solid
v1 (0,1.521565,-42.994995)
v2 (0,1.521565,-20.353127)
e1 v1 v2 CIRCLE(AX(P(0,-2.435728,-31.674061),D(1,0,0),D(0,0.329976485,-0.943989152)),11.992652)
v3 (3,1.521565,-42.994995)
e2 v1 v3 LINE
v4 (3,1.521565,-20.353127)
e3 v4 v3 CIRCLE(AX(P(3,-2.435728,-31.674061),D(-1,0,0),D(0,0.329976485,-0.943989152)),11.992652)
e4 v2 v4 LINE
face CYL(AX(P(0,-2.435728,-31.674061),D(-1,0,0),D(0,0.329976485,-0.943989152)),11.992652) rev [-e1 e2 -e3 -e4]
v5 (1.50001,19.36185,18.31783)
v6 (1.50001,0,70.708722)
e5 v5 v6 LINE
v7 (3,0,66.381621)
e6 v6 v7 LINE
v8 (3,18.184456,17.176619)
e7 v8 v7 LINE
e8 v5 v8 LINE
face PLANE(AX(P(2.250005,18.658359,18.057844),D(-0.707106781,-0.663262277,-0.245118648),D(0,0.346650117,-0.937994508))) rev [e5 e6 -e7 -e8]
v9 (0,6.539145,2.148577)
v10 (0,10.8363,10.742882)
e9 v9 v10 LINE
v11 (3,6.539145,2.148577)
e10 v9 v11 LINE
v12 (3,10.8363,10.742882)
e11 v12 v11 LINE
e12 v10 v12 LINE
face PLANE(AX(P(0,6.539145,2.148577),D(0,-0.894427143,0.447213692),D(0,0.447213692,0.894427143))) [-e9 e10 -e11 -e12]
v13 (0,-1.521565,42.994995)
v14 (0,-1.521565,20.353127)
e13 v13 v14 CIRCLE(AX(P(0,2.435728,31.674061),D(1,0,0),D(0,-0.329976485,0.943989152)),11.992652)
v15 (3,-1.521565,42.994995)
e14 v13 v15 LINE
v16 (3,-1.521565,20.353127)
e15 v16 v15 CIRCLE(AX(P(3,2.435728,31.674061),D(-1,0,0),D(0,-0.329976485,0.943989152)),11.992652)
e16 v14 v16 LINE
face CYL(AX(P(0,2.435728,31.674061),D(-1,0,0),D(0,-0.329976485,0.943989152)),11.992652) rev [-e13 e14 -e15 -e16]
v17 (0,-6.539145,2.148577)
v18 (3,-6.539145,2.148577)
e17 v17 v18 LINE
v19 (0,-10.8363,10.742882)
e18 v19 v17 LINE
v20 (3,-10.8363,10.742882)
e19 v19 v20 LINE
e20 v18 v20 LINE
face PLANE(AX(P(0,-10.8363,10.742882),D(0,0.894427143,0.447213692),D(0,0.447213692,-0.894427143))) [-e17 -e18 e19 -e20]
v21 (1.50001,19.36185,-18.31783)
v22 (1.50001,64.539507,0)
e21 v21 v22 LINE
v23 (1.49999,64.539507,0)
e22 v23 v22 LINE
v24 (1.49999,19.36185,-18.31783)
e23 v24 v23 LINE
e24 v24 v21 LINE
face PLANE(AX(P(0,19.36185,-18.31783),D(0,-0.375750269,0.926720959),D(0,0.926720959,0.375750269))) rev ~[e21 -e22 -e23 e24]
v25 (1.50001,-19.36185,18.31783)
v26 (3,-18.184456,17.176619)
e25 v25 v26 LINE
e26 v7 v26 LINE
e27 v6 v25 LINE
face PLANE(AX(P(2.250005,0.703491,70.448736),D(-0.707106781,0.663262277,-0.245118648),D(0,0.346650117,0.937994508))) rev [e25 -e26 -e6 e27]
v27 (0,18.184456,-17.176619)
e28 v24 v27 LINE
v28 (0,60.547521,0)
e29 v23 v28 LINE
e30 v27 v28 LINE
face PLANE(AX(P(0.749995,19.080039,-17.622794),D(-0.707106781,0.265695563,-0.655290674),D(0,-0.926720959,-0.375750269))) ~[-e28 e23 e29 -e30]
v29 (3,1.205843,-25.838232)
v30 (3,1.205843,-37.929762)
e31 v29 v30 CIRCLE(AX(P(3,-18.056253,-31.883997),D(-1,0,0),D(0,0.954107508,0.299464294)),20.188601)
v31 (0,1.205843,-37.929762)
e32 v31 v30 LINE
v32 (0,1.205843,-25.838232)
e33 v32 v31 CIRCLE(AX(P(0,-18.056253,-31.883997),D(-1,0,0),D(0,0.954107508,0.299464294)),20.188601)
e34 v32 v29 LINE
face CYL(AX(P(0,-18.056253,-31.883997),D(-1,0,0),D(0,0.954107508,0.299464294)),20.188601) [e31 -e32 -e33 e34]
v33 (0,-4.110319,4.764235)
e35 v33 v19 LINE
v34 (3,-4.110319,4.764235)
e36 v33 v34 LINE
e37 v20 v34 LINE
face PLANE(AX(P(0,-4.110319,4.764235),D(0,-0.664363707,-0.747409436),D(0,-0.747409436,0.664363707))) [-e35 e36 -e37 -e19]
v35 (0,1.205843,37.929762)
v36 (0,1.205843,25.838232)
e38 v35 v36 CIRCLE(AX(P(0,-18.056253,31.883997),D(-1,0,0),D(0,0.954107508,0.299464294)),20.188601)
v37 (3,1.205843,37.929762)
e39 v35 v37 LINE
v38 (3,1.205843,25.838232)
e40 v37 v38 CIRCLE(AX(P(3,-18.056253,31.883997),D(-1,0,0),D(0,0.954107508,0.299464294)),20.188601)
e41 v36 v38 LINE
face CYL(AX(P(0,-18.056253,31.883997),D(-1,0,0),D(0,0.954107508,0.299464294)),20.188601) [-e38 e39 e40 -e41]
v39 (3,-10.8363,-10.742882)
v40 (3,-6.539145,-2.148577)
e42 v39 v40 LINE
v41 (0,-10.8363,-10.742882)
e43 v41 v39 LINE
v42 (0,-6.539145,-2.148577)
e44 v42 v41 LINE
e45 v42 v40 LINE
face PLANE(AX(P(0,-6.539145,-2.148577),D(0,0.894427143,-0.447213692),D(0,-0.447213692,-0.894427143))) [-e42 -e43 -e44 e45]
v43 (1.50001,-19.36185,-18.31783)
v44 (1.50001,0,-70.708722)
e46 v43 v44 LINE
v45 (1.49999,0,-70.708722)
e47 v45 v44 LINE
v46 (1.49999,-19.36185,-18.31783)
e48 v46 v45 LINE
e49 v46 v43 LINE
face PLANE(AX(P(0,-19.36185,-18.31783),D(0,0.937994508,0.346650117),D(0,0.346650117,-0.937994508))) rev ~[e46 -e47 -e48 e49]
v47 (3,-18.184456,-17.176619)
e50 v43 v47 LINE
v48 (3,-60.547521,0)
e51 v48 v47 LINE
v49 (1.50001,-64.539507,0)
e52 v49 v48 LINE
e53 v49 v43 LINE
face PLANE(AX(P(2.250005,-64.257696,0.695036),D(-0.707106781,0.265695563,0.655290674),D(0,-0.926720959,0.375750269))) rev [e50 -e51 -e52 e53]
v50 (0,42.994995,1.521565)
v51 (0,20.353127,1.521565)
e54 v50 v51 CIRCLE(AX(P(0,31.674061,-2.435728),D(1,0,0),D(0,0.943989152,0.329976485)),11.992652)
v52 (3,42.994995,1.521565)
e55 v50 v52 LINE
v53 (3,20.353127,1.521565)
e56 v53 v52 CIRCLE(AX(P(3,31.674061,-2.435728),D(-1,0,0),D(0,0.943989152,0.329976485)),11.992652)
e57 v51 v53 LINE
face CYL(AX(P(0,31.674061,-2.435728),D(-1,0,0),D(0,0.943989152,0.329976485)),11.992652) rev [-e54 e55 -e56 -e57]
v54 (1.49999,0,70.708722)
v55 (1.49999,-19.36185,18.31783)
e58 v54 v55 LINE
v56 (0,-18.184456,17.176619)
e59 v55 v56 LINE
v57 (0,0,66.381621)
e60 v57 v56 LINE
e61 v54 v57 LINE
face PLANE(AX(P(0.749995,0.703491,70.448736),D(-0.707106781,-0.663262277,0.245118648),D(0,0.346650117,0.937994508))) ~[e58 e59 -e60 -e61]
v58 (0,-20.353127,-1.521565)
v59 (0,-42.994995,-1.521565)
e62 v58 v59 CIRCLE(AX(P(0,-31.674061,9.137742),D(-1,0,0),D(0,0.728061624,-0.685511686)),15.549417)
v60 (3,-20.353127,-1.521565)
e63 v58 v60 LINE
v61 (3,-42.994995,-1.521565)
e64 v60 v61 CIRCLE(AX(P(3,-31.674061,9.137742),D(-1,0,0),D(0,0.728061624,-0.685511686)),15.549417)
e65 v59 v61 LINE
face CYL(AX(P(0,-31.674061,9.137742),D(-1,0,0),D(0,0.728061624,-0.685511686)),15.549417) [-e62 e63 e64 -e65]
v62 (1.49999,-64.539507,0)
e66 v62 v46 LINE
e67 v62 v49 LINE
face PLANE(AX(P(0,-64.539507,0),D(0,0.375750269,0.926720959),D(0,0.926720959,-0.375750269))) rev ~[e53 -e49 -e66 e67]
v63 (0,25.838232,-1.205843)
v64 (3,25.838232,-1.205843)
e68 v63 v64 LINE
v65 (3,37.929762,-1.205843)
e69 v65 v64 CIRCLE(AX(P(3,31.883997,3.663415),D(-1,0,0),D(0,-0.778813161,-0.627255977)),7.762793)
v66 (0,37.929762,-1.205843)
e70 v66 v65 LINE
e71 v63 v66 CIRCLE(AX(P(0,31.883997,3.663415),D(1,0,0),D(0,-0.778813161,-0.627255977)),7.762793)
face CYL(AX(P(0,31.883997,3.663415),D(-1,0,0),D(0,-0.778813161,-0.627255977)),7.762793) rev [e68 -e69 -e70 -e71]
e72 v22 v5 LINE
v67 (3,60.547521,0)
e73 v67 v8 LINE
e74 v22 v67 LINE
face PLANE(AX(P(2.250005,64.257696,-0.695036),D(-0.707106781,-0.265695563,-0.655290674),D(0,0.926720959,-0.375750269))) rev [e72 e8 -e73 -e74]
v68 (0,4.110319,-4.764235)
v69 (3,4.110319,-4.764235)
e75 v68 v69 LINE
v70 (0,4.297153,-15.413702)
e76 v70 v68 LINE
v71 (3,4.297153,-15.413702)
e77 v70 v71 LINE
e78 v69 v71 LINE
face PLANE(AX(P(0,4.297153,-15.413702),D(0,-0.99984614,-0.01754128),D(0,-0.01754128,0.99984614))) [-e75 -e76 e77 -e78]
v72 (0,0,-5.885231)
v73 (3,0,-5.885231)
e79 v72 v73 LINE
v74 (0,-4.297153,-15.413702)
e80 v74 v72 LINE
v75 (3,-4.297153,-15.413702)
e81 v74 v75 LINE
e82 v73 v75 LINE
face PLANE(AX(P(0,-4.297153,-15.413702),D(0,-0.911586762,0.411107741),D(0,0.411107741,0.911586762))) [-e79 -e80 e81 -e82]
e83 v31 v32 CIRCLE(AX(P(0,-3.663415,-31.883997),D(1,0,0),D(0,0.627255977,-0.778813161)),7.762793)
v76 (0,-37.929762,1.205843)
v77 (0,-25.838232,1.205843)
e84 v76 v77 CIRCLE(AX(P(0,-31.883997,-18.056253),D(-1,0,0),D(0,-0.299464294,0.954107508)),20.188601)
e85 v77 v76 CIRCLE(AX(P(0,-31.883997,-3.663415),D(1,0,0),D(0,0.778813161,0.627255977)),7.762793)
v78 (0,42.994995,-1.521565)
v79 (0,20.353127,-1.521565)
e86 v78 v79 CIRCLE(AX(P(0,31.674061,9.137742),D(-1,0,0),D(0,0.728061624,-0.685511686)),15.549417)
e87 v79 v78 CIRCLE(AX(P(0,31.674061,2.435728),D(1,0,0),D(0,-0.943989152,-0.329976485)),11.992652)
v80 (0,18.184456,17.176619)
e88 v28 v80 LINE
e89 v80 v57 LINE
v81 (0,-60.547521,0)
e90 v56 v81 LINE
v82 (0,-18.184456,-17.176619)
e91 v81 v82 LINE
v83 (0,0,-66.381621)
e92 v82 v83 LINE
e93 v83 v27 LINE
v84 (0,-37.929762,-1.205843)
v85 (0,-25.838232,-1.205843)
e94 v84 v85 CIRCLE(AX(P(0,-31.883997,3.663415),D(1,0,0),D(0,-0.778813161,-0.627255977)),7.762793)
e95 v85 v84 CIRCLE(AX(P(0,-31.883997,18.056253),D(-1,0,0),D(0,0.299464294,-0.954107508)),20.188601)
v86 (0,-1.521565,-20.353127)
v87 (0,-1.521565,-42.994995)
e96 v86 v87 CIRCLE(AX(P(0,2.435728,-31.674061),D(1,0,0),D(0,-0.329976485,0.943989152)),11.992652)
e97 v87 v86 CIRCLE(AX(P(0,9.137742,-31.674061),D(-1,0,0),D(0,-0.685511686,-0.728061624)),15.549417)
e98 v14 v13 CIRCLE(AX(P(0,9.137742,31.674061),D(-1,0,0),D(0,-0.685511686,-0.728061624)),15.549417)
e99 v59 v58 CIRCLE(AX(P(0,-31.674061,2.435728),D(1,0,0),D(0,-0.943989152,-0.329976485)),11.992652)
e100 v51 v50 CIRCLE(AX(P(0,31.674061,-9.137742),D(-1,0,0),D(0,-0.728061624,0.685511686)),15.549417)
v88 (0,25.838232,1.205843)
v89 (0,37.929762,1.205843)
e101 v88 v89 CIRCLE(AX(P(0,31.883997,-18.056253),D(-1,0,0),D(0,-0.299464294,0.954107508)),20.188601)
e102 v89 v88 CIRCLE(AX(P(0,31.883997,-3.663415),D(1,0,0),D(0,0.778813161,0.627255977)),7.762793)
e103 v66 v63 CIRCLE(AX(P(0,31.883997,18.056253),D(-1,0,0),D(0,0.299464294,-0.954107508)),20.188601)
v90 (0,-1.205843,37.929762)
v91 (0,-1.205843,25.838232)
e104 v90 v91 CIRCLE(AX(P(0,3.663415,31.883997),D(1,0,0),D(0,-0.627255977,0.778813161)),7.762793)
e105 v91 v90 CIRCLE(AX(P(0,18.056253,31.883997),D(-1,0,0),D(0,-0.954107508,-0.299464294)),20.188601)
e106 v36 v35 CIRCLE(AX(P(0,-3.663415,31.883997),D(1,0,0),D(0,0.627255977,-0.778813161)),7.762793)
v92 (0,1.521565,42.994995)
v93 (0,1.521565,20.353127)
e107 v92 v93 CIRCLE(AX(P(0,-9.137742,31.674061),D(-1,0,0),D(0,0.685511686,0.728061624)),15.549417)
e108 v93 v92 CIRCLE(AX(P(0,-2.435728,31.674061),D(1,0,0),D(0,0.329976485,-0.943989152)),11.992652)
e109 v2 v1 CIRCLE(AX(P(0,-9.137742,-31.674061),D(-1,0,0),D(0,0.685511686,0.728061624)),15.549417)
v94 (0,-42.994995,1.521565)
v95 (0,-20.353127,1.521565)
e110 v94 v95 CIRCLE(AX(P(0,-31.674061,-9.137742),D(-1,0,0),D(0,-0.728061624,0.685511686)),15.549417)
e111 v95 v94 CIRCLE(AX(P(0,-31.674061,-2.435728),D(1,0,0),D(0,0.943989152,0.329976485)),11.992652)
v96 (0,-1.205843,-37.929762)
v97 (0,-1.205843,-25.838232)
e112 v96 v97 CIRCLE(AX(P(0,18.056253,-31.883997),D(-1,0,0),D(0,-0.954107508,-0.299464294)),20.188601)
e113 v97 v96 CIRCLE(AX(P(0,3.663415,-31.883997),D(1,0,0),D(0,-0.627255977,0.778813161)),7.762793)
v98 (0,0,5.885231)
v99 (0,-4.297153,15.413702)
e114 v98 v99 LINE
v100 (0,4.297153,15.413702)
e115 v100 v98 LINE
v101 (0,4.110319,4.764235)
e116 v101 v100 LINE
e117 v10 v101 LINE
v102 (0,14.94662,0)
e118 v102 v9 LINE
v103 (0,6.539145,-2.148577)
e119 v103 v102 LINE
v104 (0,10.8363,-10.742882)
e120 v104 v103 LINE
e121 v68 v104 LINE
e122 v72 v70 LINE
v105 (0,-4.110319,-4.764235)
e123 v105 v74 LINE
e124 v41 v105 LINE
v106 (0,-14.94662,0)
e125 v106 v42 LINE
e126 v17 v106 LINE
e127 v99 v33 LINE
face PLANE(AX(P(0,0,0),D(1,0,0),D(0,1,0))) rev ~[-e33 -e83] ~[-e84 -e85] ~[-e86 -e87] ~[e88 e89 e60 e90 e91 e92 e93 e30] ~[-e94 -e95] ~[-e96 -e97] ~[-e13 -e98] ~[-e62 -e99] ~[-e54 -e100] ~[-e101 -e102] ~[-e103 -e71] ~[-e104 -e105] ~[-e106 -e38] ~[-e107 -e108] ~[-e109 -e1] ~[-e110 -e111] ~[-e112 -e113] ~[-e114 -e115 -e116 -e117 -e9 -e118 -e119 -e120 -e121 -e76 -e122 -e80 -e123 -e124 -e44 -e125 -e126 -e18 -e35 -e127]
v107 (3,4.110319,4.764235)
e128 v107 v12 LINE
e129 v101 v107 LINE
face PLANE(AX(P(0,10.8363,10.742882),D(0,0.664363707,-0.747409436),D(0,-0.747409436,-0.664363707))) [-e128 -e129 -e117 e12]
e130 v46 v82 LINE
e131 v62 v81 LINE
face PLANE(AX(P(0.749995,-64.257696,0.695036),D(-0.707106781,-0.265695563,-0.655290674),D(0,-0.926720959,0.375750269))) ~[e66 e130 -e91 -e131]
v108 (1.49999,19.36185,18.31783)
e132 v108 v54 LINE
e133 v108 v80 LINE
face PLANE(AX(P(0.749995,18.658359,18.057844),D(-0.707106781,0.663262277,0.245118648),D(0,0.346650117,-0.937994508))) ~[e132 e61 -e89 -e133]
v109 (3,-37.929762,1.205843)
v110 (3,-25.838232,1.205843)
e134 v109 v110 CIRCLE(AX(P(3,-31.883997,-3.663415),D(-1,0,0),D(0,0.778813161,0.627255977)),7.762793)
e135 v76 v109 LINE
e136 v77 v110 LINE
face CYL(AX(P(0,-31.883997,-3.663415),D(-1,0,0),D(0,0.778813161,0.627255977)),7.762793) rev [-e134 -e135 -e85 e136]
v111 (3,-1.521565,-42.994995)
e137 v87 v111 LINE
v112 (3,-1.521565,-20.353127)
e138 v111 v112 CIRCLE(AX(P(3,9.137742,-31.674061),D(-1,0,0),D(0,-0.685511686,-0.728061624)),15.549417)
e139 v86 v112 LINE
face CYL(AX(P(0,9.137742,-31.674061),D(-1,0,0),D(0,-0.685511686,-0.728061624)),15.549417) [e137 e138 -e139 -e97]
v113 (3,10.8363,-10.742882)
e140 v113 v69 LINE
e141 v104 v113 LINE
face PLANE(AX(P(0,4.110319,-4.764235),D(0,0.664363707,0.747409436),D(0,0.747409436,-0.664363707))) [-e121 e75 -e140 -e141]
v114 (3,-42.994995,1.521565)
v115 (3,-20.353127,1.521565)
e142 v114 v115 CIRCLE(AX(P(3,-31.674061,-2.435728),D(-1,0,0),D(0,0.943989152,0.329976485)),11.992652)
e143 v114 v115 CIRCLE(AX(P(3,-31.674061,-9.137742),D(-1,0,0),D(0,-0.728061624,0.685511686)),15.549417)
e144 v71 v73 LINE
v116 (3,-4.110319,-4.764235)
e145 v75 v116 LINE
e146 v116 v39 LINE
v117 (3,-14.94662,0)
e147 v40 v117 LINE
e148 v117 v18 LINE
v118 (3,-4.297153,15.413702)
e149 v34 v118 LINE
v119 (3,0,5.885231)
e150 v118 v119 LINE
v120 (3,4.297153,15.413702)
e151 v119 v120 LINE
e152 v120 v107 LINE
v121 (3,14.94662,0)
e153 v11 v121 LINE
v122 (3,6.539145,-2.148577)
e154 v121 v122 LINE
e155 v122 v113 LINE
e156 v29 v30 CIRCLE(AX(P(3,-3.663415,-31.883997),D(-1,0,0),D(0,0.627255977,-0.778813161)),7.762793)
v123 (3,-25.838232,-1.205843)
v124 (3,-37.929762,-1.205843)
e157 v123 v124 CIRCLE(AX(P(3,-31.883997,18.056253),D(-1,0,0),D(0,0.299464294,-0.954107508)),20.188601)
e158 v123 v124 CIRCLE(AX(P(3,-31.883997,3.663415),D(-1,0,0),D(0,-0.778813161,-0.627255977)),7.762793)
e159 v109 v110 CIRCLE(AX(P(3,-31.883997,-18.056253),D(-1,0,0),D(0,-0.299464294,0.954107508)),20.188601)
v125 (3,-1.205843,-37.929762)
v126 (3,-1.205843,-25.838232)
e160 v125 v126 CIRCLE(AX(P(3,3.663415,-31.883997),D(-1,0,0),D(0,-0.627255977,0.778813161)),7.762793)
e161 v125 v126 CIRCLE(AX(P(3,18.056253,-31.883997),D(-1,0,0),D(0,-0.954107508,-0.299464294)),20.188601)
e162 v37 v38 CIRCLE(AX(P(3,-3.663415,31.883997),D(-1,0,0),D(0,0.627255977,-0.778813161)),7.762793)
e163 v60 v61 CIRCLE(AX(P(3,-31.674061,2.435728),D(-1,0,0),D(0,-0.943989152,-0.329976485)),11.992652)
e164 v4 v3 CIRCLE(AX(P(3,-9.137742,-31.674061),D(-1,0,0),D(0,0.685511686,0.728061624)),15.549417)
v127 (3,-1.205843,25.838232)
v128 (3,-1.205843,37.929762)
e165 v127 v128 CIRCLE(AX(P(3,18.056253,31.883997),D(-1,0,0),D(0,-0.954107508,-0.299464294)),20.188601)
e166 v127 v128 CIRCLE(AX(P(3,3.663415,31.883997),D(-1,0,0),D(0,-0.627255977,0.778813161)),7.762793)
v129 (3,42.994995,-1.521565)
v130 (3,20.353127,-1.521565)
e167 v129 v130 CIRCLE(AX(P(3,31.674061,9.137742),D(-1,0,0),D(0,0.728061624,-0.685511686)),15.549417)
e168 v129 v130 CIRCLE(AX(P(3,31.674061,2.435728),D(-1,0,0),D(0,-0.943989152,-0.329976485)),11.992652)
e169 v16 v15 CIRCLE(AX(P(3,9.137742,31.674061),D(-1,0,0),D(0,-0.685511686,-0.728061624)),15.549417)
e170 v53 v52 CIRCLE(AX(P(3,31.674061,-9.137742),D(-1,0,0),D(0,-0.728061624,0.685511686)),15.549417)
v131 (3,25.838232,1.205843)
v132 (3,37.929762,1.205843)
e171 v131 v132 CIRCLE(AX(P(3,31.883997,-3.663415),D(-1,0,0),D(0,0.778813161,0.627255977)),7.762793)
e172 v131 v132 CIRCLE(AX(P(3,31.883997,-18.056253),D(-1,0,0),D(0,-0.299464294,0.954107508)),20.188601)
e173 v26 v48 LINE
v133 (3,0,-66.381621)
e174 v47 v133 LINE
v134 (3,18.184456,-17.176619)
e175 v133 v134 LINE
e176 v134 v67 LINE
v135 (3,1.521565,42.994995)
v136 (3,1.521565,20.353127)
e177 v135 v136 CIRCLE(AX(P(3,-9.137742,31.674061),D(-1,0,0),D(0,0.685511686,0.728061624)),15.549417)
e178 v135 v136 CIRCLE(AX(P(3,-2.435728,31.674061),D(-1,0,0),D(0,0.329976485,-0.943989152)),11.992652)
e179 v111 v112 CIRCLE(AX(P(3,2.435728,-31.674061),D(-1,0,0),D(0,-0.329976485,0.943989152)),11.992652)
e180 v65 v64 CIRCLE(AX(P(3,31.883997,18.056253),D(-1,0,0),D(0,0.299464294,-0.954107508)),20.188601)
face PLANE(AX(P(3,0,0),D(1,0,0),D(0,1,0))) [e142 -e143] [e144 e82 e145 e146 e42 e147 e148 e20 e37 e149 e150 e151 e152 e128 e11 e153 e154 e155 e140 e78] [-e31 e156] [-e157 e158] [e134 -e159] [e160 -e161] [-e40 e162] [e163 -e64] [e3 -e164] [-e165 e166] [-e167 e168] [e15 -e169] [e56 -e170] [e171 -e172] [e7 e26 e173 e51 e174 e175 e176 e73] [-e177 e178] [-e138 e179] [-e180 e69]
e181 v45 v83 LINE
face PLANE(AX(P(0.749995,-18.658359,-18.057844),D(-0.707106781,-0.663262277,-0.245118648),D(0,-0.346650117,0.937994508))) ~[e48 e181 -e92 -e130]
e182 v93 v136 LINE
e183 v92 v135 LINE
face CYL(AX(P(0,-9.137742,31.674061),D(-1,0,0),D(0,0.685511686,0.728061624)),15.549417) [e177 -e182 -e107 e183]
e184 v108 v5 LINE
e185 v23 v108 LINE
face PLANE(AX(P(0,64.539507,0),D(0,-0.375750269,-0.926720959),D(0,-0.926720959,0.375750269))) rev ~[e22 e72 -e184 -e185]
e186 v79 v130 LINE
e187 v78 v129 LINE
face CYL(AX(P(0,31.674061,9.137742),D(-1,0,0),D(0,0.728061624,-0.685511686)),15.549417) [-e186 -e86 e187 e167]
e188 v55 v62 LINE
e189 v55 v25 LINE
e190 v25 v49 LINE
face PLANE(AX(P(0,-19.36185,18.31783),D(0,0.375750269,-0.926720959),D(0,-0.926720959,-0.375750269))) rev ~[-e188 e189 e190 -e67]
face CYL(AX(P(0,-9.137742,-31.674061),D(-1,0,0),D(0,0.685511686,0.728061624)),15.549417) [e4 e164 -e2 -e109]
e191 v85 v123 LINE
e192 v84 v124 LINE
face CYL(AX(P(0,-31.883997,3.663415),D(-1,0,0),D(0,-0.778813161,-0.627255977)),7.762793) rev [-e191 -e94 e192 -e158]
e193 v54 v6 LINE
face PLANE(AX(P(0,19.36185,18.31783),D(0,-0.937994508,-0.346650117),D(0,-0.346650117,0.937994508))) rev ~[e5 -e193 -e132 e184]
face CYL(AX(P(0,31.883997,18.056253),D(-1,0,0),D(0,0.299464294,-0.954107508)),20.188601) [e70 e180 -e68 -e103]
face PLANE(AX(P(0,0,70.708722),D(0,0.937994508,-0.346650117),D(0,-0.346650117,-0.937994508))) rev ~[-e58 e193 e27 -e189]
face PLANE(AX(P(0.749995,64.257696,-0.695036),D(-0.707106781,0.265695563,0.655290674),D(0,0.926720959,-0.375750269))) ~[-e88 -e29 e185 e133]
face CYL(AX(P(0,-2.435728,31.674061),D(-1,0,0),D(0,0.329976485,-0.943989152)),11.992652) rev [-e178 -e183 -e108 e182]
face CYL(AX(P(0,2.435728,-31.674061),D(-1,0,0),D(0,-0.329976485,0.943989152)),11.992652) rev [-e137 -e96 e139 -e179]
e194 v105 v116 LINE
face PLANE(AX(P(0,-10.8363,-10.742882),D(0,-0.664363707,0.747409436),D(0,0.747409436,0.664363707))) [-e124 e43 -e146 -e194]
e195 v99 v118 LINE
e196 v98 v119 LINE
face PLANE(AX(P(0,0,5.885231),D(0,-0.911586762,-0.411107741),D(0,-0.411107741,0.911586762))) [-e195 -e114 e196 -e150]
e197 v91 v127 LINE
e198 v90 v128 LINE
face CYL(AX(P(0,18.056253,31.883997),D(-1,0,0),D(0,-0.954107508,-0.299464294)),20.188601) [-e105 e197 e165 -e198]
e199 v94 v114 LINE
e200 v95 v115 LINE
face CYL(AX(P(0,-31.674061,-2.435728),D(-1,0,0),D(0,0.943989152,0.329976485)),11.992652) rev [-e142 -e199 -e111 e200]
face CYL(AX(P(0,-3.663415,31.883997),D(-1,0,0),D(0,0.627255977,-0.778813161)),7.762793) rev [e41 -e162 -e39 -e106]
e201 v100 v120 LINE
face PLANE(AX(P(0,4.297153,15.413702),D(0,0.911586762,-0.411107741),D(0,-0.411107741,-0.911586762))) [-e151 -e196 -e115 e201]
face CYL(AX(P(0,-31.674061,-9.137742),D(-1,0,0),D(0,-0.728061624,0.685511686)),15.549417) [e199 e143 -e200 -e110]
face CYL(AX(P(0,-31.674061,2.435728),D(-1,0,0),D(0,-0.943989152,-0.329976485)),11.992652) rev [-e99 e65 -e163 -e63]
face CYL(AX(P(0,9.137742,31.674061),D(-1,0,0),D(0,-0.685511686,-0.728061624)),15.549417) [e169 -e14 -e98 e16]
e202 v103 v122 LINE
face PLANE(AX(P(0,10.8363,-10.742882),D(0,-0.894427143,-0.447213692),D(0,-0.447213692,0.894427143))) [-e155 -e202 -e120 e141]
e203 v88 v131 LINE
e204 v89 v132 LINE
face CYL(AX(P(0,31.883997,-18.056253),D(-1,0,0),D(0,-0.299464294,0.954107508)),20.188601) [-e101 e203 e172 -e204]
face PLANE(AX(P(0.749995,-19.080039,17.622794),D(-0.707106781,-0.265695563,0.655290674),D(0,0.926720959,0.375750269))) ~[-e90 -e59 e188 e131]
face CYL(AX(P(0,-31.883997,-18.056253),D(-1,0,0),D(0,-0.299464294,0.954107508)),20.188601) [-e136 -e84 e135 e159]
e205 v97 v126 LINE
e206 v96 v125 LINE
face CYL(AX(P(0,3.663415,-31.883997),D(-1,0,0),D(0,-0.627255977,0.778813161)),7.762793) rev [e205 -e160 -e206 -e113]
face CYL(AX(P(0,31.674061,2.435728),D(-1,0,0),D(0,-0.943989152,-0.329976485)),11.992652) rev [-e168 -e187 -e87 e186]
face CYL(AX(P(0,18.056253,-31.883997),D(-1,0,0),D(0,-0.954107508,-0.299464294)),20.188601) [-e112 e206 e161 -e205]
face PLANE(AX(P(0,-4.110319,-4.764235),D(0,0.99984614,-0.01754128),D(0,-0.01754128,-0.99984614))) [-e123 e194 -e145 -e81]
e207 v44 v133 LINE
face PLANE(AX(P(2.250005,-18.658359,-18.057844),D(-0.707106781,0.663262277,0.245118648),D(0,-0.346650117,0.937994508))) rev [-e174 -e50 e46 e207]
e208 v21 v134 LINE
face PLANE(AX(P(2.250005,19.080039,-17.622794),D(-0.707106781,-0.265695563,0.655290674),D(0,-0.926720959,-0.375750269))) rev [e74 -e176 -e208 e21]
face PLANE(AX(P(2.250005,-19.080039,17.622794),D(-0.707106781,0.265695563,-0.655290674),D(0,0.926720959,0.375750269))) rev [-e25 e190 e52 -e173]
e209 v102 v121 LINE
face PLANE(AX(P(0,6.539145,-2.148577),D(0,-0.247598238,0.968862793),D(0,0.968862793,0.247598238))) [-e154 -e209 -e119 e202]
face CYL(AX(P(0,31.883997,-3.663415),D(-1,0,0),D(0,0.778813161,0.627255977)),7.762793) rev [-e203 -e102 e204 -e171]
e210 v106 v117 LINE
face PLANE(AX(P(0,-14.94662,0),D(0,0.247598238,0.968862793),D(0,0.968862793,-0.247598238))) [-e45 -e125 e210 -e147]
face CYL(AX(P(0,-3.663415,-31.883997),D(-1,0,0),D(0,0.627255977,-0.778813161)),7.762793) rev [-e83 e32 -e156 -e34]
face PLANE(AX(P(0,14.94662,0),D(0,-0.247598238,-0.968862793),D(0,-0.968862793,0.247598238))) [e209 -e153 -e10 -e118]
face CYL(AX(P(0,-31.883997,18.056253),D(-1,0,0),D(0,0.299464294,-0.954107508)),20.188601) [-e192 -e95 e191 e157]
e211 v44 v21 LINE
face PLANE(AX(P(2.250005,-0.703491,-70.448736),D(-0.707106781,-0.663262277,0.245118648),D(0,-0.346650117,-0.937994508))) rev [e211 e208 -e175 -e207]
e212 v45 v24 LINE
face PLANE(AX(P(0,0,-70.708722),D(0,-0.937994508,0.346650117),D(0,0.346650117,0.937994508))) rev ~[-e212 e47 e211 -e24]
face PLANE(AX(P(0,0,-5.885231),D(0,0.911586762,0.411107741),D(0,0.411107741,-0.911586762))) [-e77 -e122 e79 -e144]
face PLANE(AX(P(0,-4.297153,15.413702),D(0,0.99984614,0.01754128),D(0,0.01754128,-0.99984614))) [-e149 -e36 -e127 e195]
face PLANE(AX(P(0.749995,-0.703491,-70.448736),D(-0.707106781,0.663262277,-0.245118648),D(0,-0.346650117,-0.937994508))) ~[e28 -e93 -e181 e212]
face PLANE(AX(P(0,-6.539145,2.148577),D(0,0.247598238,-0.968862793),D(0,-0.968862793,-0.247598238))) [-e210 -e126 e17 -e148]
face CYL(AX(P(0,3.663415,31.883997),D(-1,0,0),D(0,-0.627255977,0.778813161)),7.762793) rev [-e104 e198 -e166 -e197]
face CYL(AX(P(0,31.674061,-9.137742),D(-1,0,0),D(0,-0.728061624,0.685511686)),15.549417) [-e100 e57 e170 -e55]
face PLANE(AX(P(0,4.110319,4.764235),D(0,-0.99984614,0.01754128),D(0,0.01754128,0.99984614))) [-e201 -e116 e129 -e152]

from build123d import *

# Parameters (mm, degrees)
F1_DEPTH = 3
F2_SIZE  = 1.49999
F4_DEPTH = 25
F6_DEPTH = 3.001
F8_COUNT = 4


# Not quite as in the source:
# - a fillet or chamfer is up to 0.001 mm smaller than in the source, because OpenCascade refuses the exact size


with BuildPart() as f1:
    # F0 (on Right) → F1 (new body)
    with BuildSketch(Plane.YZ):
        Polygon((-19.3618498743, -18.3178298175), (0, -70.7087218761), (19.3618498743, -18.3178298175), (64.5395070314, 0), (19.3618498743, 18.3178298175), (0, 70.7087218761), (-19.3618498743, 18.3178298175), (-64.5395070314, 0), align=None)
    extrude(amount=F1_DEPTH)

    # F2 (size 1.5 in the source; OpenCascade refuses exactly that, so slightly less here)
    f2_edges = [f1.edges().sort_by_distance(p)[0] for p in [
        (3, -41.950678, 9.158915),
        (3, -9.680925, 44.513276),
        (0, -9.680925, 44.513276),
        (0, -41.950678, 9.158915),
        (0, -41.950678, -9.158915),
        (3, -41.950678, -9.158915),
        (0, -9.680925, -44.513276),
        (3, -9.680925, -44.513276),
        (3, 9.680925, -44.513276),
        (0, 9.680925, -44.513276),
        (3, 41.950678, -9.158915),
        (0, 41.950678, -9.158915),
        (0, 9.680925, 44.513276),
        (3, 9.680925, 44.513276),
        (3, 41.950678, 9.158915),
        (0, 41.950678, 9.158915),
    ]]
    chamfer(f2_edges, length=F2_SIZE)

    # F3 (on Right) → F4 (cut)
    with BuildSketch(Plane.YZ):
        Polygon((-4.2971530929, -15.4137015343), (0, -5.8852313086), (4.2971530929, -15.4137015343), (4.1103190742, -4.7642351128), (10.8362995088, -10.7428822666), (6.5391454846, -2.1485765465), (14.94661998, 0), (6.5391454846, 2.1485765465), (10.8362995088, 10.7428822666), (4.1103190742, 4.7642351128), (4.2971530929, 15.4137015343), (0, 5.8852313086), (-4.2971530929, 15.4137015343), (-4.1103190742, 4.7642351128), (-10.8362995088, 10.7428822666), (-6.5391454846, 2.1485765465), (-14.94661998, 0), (-6.5391454846, -2.1485765465), (-10.8362995088, -10.7428822666), (-4.1103190742, -4.7642351128), align=None)
    extrude(amount=F4_DEPTH, mode=Mode.SUBTRACT)

    # F5 (on Right) → F6 (cut, through all)
    with BuildSketch(Plane.YZ):
        with BuildLine():
            ThreePointArc((-1.5215650201, -20.3531272709), (-9.5569240867, -31.6740609705), (-1.5215650201, -42.9949946702))
            ThreePointArc((-1.5215650201, -42.9949946702), (-6.4116749119, -31.6740609705), (-1.5215650201, -20.3531272709))
        make_face()
        with BuildLine():
            ThreePointArc((-1.2058431748, -25.8382316679), (-4.0993778142, -31.8839969113), (-1.2058431748, -37.9297621548))
            ThreePointArc((-1.2058431748, -37.9297621548), (-2.1323484034, -31.8839969113), (-1.2058431748, -25.8382316679))
        make_face()
        with BuildLine():
            ThreePointArc((1.5215650201, -20.3531272709), (6.4116749119, -31.6740609705), (1.5215650201, -42.9949946702))
            ThreePointArc((1.5215650201, -42.9949946702), (9.5569240867, -31.6740609705), (1.5215650201, -20.3531272709))
        make_face()
        with BuildLine():
            ThreePointArc((1.2058431748, -25.8382316679), (2.1323484034, -31.8839969113), (1.2058431748, -37.9297621548))
            ThreePointArc((1.2058431748, -37.9297621548), (4.0993778142, -31.8839969113), (1.2058431748, -25.8382316679))
        make_face()
    f6 = extrude(amount=F6_DEPTH, mode=Mode.SUBTRACT)

    # F8: F6 ×4 about axis
    f8_axis = Axis((-24.6906243265, 0, 0), (-1, 0, 0))
    for i in range(1, F8_COUNT):
        add(f6.rotate(f8_axis, i * 360 / F8_COUNT), mode=Mode.SUBTRACT)


solid = f1.part
